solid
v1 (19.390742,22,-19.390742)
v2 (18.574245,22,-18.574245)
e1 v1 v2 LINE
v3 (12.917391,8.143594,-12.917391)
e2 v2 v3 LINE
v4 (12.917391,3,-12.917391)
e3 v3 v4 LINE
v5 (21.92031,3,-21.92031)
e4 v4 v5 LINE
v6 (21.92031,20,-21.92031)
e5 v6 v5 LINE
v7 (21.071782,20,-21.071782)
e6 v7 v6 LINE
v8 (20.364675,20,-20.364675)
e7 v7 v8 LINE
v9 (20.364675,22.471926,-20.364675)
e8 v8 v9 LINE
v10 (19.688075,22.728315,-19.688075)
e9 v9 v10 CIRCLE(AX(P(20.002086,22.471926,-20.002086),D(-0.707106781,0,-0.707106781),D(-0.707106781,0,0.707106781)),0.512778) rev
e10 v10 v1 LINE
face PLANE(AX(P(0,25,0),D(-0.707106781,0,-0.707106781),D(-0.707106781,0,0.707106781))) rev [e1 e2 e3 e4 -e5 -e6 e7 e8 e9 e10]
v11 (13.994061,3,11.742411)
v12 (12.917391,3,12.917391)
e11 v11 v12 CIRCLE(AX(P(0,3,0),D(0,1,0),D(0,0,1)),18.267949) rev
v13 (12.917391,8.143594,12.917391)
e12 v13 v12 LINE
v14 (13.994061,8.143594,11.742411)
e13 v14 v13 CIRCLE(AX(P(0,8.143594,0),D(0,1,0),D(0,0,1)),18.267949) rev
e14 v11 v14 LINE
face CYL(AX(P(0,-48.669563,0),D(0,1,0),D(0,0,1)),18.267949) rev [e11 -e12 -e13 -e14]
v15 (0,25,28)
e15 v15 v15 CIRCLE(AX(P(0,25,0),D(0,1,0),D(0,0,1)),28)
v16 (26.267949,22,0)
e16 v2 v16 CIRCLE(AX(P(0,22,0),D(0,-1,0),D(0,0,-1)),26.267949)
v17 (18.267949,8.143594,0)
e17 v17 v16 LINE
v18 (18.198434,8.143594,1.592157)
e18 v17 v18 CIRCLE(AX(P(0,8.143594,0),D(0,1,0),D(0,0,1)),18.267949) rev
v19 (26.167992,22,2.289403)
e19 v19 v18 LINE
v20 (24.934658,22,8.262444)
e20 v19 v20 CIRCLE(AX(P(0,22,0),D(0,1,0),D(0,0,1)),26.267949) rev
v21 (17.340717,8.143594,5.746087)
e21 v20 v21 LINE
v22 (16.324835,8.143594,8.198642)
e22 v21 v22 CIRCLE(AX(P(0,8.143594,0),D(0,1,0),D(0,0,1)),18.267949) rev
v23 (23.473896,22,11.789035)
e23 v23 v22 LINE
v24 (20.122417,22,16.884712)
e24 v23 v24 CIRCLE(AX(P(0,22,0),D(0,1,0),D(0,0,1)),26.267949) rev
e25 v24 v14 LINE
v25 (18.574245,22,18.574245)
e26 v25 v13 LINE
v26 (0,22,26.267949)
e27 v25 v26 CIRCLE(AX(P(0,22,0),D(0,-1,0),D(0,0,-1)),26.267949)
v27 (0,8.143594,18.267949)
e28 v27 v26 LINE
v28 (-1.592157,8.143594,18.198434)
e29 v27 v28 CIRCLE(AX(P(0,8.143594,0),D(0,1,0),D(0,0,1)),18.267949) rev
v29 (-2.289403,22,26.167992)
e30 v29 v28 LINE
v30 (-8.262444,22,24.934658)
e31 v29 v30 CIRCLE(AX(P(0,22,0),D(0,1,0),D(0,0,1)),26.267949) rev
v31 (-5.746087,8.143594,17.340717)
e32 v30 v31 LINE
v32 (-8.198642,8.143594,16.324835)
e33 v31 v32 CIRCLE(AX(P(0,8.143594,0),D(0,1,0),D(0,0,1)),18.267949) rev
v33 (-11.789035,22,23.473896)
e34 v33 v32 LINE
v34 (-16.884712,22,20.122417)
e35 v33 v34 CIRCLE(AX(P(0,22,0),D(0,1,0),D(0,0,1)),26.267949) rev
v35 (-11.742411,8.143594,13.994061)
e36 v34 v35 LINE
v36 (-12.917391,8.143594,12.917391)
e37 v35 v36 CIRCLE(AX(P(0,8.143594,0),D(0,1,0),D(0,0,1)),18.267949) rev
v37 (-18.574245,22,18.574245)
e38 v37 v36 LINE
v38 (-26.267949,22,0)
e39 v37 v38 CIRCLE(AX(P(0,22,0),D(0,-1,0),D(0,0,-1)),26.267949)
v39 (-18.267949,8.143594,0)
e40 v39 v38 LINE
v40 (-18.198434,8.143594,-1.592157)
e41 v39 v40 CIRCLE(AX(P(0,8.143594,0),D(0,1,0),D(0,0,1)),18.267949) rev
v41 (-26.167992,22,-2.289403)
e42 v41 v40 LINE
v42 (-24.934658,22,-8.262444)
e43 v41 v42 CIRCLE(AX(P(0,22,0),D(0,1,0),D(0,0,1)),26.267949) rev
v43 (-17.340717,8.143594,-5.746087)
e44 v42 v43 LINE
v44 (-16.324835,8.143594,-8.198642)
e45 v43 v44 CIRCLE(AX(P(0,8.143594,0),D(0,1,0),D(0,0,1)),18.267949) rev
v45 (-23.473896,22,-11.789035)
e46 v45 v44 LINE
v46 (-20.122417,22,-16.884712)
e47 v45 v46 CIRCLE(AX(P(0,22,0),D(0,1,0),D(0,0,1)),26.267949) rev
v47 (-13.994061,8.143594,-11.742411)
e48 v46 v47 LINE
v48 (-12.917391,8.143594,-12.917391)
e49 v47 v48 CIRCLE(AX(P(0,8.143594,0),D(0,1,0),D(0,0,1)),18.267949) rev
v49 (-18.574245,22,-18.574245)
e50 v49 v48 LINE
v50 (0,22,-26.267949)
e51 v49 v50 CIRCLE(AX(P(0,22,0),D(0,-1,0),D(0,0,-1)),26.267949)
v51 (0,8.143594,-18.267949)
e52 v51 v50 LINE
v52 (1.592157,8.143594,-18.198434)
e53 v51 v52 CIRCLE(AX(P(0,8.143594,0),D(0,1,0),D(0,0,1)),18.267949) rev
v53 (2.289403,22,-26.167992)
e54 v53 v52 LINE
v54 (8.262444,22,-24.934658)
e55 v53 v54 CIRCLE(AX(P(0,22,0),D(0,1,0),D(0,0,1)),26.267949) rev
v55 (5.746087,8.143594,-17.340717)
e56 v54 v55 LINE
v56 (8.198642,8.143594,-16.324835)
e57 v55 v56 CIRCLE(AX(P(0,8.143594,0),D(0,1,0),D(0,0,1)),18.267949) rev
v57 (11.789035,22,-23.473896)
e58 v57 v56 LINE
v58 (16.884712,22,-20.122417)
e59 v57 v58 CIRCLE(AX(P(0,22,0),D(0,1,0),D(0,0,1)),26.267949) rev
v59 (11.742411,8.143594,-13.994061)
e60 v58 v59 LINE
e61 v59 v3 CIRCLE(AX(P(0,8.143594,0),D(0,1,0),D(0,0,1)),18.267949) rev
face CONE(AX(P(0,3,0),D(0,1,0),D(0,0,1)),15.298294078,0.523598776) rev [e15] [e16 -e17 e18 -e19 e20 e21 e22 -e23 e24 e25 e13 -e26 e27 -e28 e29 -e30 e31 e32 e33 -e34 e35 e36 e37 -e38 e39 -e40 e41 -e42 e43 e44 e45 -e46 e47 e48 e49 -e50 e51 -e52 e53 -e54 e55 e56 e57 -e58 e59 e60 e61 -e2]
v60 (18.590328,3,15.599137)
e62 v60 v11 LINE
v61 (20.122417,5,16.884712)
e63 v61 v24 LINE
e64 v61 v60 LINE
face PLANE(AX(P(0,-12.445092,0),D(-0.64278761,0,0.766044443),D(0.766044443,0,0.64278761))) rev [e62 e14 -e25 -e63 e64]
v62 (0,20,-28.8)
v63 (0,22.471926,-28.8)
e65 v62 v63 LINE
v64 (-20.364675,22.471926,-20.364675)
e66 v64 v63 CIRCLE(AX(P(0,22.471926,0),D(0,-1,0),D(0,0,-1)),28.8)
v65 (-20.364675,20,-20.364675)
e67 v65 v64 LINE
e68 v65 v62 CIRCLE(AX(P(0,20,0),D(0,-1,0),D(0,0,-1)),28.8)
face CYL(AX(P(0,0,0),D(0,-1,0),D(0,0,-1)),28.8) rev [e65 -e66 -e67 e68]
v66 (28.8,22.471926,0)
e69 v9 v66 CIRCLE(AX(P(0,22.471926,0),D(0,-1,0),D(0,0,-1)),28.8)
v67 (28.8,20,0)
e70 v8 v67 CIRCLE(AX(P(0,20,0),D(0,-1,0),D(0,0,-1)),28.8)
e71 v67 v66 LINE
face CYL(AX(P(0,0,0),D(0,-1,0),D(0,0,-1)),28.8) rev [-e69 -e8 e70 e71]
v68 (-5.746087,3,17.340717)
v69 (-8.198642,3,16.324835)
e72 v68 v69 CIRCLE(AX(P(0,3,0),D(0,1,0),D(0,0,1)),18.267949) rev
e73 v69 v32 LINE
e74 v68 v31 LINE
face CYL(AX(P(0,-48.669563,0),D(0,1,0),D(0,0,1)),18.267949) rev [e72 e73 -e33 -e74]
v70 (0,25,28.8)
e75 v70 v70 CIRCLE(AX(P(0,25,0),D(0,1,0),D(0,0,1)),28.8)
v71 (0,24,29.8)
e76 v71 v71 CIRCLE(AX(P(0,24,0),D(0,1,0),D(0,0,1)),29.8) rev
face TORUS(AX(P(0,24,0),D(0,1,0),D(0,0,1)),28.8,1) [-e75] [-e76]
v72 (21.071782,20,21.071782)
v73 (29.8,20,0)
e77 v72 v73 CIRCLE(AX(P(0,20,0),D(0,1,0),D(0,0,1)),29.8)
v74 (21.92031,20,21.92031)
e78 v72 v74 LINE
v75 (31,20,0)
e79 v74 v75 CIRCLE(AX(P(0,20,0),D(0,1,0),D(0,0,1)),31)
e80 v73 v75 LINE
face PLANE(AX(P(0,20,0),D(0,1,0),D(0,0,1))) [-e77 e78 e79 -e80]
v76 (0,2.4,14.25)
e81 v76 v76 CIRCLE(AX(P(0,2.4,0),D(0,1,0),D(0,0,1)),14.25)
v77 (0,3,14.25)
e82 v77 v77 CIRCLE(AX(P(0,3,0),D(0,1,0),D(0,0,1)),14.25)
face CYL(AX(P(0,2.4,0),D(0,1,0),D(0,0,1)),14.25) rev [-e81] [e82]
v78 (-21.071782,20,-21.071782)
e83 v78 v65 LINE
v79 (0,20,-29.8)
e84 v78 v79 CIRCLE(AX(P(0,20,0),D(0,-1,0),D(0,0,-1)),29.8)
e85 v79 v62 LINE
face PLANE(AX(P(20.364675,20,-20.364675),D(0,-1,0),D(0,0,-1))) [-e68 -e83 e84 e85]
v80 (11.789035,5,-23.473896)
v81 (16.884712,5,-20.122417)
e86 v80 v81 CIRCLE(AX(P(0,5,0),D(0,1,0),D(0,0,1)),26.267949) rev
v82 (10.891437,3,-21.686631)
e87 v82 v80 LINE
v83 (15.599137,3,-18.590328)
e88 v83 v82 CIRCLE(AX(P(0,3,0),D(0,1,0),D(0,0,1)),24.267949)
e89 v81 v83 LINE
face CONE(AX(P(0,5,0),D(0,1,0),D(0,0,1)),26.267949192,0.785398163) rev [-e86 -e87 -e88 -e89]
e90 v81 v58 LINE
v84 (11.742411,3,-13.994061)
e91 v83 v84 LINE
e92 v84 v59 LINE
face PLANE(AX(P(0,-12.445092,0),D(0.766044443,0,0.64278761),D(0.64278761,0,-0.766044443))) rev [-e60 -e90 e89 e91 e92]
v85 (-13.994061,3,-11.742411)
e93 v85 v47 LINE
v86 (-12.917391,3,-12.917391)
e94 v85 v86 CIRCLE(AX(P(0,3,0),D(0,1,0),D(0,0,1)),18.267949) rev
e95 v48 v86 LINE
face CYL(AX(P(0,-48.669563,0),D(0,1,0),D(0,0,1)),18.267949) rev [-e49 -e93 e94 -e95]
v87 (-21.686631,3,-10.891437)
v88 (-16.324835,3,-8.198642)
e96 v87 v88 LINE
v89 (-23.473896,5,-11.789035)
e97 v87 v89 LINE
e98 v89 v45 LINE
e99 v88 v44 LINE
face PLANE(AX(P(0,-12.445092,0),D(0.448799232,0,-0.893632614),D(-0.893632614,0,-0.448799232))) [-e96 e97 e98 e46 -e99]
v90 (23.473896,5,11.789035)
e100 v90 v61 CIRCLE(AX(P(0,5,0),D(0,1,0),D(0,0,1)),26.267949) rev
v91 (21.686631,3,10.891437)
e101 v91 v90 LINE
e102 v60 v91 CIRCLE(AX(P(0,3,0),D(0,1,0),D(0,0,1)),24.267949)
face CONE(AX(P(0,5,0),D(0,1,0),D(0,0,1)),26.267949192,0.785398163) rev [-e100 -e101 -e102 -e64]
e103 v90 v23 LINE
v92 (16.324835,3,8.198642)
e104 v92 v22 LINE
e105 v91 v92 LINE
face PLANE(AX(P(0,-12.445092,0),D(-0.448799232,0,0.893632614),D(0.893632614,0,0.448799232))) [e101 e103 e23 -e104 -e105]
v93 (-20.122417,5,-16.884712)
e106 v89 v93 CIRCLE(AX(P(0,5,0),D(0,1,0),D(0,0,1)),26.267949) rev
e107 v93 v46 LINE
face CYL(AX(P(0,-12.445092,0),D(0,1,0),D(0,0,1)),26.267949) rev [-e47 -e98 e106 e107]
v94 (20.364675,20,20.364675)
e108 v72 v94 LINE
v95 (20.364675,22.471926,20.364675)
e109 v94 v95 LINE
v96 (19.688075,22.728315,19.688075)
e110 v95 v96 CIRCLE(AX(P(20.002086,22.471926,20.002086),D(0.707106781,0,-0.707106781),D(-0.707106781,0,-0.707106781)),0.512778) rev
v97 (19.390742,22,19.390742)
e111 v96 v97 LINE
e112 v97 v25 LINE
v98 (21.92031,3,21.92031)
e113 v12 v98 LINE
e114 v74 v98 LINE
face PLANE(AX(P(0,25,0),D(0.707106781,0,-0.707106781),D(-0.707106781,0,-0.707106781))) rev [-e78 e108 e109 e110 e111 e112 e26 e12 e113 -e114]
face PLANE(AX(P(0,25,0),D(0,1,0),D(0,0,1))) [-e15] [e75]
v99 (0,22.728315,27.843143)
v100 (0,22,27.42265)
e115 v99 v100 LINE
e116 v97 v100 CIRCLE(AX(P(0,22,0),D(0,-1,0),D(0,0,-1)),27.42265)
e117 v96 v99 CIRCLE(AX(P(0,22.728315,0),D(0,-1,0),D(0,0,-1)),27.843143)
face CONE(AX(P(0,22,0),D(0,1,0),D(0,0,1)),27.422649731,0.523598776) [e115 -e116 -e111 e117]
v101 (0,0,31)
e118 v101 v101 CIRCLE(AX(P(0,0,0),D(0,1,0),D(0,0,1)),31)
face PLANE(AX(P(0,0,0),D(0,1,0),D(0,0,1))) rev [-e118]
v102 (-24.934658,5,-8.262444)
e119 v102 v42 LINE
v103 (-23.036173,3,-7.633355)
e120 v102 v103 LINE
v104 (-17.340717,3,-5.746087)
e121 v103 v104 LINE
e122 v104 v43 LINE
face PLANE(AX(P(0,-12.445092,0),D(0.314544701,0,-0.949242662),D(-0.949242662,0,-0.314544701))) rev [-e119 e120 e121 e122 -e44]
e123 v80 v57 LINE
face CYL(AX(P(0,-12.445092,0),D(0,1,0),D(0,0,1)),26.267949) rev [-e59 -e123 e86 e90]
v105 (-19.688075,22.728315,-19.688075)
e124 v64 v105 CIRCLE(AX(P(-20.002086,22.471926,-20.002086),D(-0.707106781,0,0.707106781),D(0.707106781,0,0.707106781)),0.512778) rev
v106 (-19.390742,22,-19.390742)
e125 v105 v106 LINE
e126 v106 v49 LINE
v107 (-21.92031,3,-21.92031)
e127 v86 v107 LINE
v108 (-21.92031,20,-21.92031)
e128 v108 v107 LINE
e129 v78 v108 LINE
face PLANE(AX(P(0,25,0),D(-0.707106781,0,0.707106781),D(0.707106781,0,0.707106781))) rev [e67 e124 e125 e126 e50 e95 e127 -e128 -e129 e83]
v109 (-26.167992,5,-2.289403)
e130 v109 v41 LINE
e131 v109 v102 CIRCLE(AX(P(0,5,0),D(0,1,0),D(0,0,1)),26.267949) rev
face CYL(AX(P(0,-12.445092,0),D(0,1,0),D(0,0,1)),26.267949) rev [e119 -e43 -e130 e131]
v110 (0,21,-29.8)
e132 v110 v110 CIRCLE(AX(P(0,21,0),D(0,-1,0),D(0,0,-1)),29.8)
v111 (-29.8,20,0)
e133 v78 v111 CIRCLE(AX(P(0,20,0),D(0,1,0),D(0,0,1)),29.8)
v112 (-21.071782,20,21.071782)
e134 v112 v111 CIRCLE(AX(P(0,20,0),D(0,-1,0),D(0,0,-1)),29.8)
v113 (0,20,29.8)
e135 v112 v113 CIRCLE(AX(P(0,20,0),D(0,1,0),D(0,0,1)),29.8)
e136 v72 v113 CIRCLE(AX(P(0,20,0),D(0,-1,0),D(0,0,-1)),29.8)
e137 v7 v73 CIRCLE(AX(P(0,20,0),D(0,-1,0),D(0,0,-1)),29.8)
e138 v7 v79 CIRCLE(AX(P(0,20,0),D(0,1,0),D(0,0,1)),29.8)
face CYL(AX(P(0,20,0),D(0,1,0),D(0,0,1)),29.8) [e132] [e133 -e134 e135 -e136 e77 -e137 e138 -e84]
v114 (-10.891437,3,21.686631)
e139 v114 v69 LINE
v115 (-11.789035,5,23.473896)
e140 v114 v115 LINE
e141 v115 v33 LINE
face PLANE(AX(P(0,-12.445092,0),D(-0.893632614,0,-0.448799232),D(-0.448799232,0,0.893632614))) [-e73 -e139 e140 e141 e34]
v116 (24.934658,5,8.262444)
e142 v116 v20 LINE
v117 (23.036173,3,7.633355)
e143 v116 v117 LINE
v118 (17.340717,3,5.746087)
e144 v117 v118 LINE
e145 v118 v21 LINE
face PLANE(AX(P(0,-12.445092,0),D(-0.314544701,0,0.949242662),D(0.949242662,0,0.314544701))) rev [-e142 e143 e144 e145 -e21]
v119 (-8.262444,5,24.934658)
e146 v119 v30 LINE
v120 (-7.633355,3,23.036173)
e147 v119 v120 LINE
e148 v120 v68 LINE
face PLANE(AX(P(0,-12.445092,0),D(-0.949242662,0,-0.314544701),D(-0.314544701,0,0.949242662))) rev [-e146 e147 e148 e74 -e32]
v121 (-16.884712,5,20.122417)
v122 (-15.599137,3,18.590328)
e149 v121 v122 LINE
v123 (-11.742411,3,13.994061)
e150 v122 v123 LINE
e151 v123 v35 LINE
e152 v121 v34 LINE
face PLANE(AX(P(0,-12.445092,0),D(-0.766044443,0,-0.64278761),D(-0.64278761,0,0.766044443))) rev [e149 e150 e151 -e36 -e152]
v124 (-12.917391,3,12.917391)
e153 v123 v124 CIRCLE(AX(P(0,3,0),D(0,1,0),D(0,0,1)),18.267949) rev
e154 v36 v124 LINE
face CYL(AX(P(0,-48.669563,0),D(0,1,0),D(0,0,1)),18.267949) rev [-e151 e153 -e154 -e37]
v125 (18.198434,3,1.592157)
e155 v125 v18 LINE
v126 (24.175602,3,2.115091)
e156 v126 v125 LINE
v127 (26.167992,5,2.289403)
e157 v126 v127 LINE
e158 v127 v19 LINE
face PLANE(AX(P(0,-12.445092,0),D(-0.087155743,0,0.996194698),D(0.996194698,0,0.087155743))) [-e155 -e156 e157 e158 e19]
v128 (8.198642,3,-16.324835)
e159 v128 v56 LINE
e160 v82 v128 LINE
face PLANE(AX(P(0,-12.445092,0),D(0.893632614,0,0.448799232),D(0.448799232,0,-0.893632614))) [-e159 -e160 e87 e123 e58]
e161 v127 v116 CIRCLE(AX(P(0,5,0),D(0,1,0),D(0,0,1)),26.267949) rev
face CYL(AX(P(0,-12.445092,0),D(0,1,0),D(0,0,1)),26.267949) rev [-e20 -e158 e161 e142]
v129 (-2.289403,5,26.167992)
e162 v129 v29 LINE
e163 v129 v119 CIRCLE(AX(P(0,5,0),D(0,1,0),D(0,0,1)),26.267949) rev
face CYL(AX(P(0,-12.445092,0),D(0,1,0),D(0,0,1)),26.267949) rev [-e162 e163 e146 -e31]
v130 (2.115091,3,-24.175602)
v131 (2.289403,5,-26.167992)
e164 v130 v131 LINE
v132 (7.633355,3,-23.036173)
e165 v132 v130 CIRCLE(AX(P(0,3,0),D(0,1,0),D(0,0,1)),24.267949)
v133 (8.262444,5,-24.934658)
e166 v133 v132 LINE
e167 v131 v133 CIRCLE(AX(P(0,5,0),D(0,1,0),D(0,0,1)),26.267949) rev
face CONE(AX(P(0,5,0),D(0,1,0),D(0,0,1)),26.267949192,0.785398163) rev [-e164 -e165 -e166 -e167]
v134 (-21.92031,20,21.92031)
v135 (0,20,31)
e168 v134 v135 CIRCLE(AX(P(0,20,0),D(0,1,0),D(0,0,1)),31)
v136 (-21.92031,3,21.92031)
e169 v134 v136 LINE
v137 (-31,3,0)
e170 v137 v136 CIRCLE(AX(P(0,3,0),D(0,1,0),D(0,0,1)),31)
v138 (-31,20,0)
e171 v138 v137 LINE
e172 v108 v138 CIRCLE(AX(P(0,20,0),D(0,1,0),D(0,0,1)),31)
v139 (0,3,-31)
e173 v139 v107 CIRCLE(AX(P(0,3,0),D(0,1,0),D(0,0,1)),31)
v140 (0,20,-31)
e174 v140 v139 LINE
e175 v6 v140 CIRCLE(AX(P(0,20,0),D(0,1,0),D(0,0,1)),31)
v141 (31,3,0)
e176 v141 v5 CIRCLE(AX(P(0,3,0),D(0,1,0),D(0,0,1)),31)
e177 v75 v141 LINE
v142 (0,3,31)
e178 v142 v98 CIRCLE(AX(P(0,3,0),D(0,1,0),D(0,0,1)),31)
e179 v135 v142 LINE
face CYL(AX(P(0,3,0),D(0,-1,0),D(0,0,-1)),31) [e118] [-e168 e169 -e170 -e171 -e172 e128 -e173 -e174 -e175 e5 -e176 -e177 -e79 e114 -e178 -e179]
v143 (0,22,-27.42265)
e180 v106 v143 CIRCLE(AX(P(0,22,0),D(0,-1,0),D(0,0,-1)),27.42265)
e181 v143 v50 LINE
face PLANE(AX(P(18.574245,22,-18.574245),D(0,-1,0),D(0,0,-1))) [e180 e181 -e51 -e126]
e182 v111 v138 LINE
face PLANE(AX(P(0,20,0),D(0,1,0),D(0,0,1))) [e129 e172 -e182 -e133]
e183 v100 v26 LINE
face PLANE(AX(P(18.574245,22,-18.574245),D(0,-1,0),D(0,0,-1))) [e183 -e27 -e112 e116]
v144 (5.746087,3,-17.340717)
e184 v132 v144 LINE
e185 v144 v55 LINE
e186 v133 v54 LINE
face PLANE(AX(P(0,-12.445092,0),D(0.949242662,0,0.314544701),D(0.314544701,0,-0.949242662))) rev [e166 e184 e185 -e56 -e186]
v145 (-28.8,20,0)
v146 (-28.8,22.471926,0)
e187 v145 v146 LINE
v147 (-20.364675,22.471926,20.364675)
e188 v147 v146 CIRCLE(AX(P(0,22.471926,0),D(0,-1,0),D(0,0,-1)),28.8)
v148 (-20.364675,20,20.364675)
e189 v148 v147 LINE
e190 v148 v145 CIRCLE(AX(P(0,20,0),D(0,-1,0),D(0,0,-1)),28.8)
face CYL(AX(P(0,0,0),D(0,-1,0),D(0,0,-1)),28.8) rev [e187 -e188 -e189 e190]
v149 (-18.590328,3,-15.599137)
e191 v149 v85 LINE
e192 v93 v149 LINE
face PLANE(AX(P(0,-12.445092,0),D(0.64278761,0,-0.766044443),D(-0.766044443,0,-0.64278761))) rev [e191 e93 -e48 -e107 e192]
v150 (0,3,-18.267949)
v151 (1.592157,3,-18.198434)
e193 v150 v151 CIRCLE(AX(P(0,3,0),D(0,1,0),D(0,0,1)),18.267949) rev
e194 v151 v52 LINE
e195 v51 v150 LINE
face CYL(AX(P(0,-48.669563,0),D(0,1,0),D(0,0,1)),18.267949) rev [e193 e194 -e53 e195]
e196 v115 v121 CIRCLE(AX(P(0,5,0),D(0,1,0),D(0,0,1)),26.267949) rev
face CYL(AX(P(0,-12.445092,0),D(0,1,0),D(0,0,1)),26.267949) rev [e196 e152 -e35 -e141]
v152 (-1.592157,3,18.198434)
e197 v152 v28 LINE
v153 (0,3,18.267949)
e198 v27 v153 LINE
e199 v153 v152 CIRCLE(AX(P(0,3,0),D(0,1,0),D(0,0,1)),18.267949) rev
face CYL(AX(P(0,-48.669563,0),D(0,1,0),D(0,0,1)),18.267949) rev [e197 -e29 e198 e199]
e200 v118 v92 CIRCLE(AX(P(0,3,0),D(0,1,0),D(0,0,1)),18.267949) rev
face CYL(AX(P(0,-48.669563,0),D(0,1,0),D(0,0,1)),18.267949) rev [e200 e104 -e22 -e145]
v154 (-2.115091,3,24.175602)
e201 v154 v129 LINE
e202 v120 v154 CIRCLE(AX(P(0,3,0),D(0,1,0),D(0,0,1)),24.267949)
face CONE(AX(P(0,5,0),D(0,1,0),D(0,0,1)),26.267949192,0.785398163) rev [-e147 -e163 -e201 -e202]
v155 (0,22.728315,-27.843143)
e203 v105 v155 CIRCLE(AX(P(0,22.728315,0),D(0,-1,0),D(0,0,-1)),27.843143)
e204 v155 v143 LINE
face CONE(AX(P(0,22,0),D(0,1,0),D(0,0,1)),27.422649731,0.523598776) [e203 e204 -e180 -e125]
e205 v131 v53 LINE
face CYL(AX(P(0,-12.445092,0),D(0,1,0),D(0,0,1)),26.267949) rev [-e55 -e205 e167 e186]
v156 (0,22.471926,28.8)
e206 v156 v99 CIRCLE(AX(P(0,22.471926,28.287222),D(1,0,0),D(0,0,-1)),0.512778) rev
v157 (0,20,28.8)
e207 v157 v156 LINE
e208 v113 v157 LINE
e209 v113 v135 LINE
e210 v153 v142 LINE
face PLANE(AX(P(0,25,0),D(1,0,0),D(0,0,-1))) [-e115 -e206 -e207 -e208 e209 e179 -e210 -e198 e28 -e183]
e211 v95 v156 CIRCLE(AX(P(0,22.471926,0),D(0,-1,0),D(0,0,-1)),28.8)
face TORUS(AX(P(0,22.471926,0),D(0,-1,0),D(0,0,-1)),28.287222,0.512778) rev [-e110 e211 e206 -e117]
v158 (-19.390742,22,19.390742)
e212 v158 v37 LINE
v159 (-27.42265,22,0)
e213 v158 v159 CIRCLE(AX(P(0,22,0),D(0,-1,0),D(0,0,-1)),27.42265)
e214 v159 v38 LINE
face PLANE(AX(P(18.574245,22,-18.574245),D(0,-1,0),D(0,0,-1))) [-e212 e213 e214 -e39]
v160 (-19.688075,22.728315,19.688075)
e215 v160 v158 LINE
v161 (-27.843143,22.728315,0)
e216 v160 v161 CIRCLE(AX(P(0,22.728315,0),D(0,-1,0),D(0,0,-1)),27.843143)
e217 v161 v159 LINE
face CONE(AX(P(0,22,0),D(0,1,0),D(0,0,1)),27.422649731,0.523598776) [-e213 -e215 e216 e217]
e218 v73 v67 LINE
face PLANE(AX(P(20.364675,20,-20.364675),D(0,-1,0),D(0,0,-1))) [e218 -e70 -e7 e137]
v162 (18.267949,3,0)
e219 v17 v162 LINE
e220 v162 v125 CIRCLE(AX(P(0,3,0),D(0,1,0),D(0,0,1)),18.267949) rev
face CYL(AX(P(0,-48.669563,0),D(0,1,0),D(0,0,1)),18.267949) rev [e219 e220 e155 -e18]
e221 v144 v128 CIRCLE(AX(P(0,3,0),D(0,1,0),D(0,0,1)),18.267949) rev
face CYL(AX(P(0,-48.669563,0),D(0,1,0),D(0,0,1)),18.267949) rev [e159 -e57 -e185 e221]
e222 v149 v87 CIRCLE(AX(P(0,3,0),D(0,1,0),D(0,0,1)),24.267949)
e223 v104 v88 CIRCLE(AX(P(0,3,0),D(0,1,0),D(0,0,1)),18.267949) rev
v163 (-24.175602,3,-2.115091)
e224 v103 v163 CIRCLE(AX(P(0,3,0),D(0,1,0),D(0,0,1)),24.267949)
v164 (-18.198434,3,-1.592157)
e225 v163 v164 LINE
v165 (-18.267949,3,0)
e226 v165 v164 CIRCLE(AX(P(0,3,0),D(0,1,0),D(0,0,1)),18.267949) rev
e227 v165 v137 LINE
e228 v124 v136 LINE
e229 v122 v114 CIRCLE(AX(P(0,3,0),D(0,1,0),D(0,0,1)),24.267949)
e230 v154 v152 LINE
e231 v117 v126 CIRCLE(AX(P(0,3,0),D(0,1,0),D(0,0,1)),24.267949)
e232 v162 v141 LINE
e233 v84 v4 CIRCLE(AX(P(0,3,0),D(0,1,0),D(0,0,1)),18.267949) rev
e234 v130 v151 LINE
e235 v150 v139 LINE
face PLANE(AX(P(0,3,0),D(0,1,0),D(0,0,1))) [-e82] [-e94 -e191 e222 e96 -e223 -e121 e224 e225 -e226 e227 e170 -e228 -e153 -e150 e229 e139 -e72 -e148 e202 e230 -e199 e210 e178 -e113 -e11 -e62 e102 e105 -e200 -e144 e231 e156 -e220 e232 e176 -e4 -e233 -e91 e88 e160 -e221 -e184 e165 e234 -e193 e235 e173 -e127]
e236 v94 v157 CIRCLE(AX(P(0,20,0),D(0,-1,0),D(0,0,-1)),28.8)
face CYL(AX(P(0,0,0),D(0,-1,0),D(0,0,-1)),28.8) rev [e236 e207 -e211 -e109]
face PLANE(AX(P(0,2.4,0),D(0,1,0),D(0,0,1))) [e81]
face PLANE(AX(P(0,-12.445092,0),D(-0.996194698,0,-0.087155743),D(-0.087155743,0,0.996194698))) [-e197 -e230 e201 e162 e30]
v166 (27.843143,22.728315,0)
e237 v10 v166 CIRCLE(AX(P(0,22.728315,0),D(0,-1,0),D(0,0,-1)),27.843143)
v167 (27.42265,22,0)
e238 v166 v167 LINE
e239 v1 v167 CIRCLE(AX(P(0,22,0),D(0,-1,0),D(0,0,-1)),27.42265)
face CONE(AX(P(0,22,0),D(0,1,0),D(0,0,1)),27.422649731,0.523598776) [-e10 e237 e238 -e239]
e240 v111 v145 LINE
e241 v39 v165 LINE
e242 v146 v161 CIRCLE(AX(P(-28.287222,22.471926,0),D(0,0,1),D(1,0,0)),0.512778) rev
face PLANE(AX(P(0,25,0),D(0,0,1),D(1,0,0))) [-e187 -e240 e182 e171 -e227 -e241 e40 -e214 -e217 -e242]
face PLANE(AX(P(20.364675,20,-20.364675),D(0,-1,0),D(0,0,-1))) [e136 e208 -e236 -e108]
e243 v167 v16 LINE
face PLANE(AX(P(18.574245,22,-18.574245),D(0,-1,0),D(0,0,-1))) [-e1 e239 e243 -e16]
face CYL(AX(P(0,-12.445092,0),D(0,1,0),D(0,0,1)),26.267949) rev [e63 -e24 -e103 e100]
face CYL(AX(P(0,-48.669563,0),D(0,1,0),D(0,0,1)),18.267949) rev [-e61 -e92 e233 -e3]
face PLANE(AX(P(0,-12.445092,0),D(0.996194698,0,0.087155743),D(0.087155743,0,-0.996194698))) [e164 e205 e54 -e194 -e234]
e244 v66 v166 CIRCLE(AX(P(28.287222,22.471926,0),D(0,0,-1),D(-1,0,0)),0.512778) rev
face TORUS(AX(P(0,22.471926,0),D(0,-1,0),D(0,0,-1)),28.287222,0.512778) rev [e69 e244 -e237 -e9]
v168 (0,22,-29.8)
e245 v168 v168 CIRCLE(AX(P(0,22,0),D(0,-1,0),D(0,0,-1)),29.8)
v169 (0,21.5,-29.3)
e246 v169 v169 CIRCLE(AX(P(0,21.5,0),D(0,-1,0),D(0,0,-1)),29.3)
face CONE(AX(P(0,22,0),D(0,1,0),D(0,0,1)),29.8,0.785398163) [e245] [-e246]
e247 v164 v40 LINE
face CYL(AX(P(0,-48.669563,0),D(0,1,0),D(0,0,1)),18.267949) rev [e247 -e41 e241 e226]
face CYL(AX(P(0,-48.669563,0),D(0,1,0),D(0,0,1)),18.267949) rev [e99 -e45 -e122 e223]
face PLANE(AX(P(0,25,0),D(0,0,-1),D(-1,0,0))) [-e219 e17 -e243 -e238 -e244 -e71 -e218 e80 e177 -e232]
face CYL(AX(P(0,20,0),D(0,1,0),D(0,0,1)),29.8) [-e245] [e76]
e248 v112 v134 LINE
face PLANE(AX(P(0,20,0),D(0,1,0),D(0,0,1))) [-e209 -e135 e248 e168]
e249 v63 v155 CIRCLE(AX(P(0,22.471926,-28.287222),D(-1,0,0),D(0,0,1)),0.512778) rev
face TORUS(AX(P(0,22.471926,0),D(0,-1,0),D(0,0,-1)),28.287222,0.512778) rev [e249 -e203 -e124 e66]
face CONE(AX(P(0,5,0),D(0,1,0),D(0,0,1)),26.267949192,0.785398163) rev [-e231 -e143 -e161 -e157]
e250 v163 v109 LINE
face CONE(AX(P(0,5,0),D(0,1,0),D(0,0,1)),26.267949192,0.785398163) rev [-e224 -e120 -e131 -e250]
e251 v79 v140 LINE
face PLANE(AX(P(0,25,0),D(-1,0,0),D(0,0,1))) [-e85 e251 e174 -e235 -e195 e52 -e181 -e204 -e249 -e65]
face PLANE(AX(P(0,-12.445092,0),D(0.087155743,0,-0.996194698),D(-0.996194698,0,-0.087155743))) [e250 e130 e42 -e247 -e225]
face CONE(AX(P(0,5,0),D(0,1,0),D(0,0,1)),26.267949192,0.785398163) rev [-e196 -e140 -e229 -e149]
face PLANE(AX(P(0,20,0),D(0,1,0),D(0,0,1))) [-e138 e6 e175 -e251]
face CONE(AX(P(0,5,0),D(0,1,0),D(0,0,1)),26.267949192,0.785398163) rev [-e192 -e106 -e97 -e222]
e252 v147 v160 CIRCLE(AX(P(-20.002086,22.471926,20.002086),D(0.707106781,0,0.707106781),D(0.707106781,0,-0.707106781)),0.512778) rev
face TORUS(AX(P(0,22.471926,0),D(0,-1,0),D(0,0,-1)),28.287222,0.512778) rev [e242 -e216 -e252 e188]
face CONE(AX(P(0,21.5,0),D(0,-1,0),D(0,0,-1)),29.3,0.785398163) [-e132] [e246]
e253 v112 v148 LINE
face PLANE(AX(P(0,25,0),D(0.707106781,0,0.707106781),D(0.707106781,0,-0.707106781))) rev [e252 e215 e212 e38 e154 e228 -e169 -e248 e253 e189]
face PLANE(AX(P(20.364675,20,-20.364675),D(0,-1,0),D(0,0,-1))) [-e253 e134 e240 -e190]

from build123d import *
from OCP.BRepFilletAPI import BRepFilletAPI_MakeChamfer
from build123d.topology import SkipClean

# Parameters (mm, degrees)
SKETCH_1_R          = 31
EXTRUDE_1_DEPTH     = 3
EXTRUDE_2_DEPTH     = 22
SKETCH_3_R          = 14.25
CUT_EXTRUDE_1_DEPTH = 0.6
CUT_EXTRUDE_START   = -5
SKETCH_4_R          = 31
SKETCH_4_R_2        = 29.8
CUT_EXTRUDE_2_DEPTH = 5
FILLET_1_R          = 1
CHAMFER_1_SIZE      = 22
CHAMFER_1_SIZE_2    = 12.701705922
CUT_EXTRUDE_3_DEPTH = 22
SKETCH_7_R          = 18.267949192
CUT_EXTRUDE_4_DEPTH = 22
CHAMFER_2_SIZE      = 2


with BuildPart() as part:
    # 草图1 → 凸台-拉伸1 (new body)
    with BuildSketch(Plane(origin=(0, 0, 0), x_dir=(1, 0, 0), z_dir=(0, 1, 0))):
        with Locations(Location((0, 0, 0), (0, 0, 270))):
            Circle(SKETCH_1_R)
    extrude(amount=EXTRUDE_1_DEPTH)

    # 草图2 → 凸台-拉伸2 (add)
    with SkipClean():  # the faces are left unmerged after this step: merging them gives an invalid solid
        with BuildSketch(Plane(origin=(0, 3, 0), x_dir=(1, 0, 0), z_dir=(0, 1, 0))):
            with BuildLine():
                Line((0, 31), (0, 28))
                ThreePointArc((0, 28), (10.715136106, 25.86862691), (19.798989873, 19.798989873))
                Line((19.798989873, 19.798989873), (21.920310217, 21.920310217))
                ThreePointArc((21.920310217, 21.920310217), (11.863186403, 28.640265508), (0, 31))
            make_face()
            with BuildLine():
                ThreePointArc((-28, 0), (-25.86862691, 10.715136106), (-19.798989873, 19.798989873))
                Line((-19.798989873, 19.798989873), (-21.920310217, 21.920310217))
                ThreePointArc((-21.920310217, 21.920310217), (-28.640265508, 11.863186403), (-31, 0))
                Line((-31, 0), (-28, 0))
            make_face()
            with BuildLine():
                ThreePointArc((0, -28), (-10.715136106, -25.86862691), (-19.798989873, -19.798989873))
                Line((-19.798989873, -19.798989873), (-21.920310217, -21.920310217))
                ThreePointArc((-21.920310217, -21.920310217), (-11.863186403, -28.640265508), (0, -31))
                Line((0, -31), (0, -28))
            make_face()
            with BuildLine():
                Line((31, 0), (28, 0))
                ThreePointArc((28, 0), (25.86862691, -10.715136106), (19.798989873, -19.798989873))
                Line((19.798989873, -19.798989873), (21.920310217, -21.920310217))
                ThreePointArc((21.920310217, -21.920310217), (28.640265508, -11.863186403), (31, 0))
            make_face()
        extrude(amount=EXTRUDE_2_DEPTH)

    # 草图3 → 切除-拉伸1 (cut)
    with SkipClean():  # the faces are left unmerged after this step: merging them gives an invalid solid
        with BuildSketch(Plane(origin=(0, 3, 0), x_dir=(1, 0, 0), z_dir=(0, 1, 0))):
            with Locations(Location((0, 0, 0), (0, 0, 270))):
                Circle(SKETCH_3_R)
        extrude(amount=-CUT_EXTRUDE_1_DEPTH, mode=Mode.SUBTRACT)

    # 草图4 → 切除-拉伸2 (cut)
    with SkipClean():  # the faces are left unmerged after this step: merging them gives an invalid solid
        with BuildSketch(Plane(origin=(0, 25, 0), x_dir=(1, 0, 0), z_dir=(0, 1, 0)).offset(CUT_EXTRUDE_START)):
            with Locations(Location((0, 0, 0), (0, 0, 270))):
                Circle(SKETCH_4_R)
            Circle(SKETCH_4_R_2, mode=Mode.SUBTRACT)
        extrude(amount=CUT_EXTRUDE_2_DEPTH, mode=Mode.SUBTRACT)

    # 圆角1
    fillet_1_edges = [part.edges().sort_by_distance(p)[0] for p in [
        (27.531610069, 25, 11.403966284),
        (11.403966284, 25, -27.531610069),
        (-27.531610069, 25, -11.403966284),
        (-11.403966284, 25, 27.531610069),
    ]]
    fillet(fillet_1_edges, radius=FILLET_1_R)

    # 倒角1
    chamfer_1_edges_1 = [part.edges().sort_by_distance(p)[0] for p in [
        (-10.715136106, 3, 25.86862691),
    ]]
    chamfer_1_side_1 = [part.faces().sort_by_distance(p)[0] for p in [
        (-10.715136106, 3.254034118, 25.86862691),
    ]]
    chamfer_1_edges_2 = [part.edges().sort_by_distance(p)[0] for p in [
        (25.86862691, 3, 10.715136106),
    ]]
    chamfer_1_side_2 = [part.faces().sort_by_distance(p)[0] for p in [
        (25.633929988, 3, 10.617921458),
    ]]
    chamfer_1_edges_3 = [part.edges().sort_by_distance(p)[0] for p in [
        (10.715136106, 3, -25.86862691),
    ]]
    chamfer_1_side_3 = [part.faces().sort_by_distance(p)[0] for p in [
        (10.617921458, 3, -25.633929988),
    ]]
    chamfer_1_edges_4 = [part.edges().sort_by_distance(p)[0] for p in [
        (-25.86862691, 3, -10.715136106),
    ]]
    chamfer_1_side_4 = [part.faces().sort_by_distance(p)[0] for p in [
        (-25.633929988, 3, -10.617921458),
    ]]
    chamfer_1 = BRepFilletAPI_MakeChamfer(part.part.solid().wrapped)
    for e in chamfer_1_edges_1:
        chamfer_1.Add(CHAMFER_1_SIZE - 0.0001, CHAMFER_1_SIZE_2 - 0.0001, e.wrapped, chamfer_1_side_1[0].wrapped)
    for e in chamfer_1_edges_2:
        chamfer_1.Add(CHAMFER_1_SIZE_2 - 0.0001, CHAMFER_1_SIZE - 0.0001, e.wrapped, chamfer_1_side_2[0].wrapped)
    for e in chamfer_1_edges_3:
        chamfer_1.Add(CHAMFER_1_SIZE_2 - 0.0001, CHAMFER_1_SIZE - 0.0001, e.wrapped, chamfer_1_side_3[0].wrapped)
    for e in chamfer_1_edges_4:
        chamfer_1.Add(CHAMFER_1_SIZE_2 - 0.0001, CHAMFER_1_SIZE - 0.0001, e.wrapped, chamfer_1_side_4[0].wrapped)
    add(Compound.cast(chamfer_1.Shape()), mode=Mode.REPLACE)  # a hair under: the kernel refuses the full size

    # 草图5 → 旋转1 (revolve)
    with SkipClean():  # the faces are left unmerged after this step: merging them gives an invalid solid
        with BuildSketch(Plane(origin=(0, 0, 0), x_dir=(0.7071067811865462, 0, -0.7071067811865488), z_dir=(0.7071067811865488, 0, 0.7071067811865462)), mode=Mode.PRIVATE) as revolve_1_sk:
            with BuildLine():
                Line((26.267949192, 22), (28, 25))
                Line((28, 25), (28.8, 25))
                ThreePointArc((28.8, 25), (29.507106781, 24.707106781), (29.8, 24))
                Line((29.8, 24), (29.8, 20))
                Line((29.8, 20), (28.8, 20))
                Line((28.8, 20), (28.8, 21.2))
                Line((28.8, 21.2), (28.8, 22.471926391))
                ThreePointArc((28.8, 22.471926391), (28.419938572, 22.967232087), (27.843142872, 22.728315485))
                Line((27.843142872, 22.728315485), (27.422649731, 22))
                Line((27.422649731, 22), (26.267949192, 22))
            make_face()
        revolve(revolve_1_sk.sketch.rotate(Axis((0, 0, 0), (0, 1, 0)), 225), axis=Axis((0, 0, 0), (0, 1, 0)))

    # 草图6 → 切除-拉伸3 (cut)
    with SkipClean():  # the faces are left unmerged after this step: merging them gives an invalid solid
        with BuildSketch(Plane(origin=(0, 25, 0), x_dir=(1, 0, 0), z_dir=(0, 1, 0))):
            with BuildLine():
                Line((2.289402622, 26.167991715), (1.333334183, 15.24007945))
                ThreePointArc((1.333334183, 15.24007945), (3.093583453, 14.982240924), (4.811997335, 14.521793393))
                Line((4.811997335, 14.521793393), (8.262444223, 24.934658013))
                ThreePointArc((8.262444223, 24.934658013), (5.311840168, 25.725269849), (2.289402622, 26.167991715))
            make_face()
            with BuildLine():
                Line((11.789035429, 23.473896107), (6.865862636, 13.67105453))
                ThreePointArc((6.865862636, 13.67105453), (8.406550317, 12.781537993), (9.833553883, 11.719173168))
                Line((9.833553883, 11.719173168), (16.884712273, 20.122416511))
                ThreePointArc((16.884712273, 20.122416511), (14.434474555, 21.946550961), (11.789035429, 23.473896107))
            make_face()
            with BuildLine():
                Line((26.167991715, -2.289402622), (15.24007945, -1.333334183))
                ThreePointArc((15.24007945, -1.333334183), (15.236219542, -1.376740994), (15.232236002, -1.420136634))
                ThreePointArc((15.232236002, -1.420136634), (14.973367893, -3.136248655), (14.521793393, -4.811997335))
                Line((14.521793393, -4.811997335), (24.934658013, -8.262444223))
                ThreePointArc((24.934658013, -8.262444223), (25.725269849, -5.311840168), (26.167991715, -2.289402622))
            make_face()
            with BuildLine():
                ThreePointArc((20.122416511, -16.884712273), (21.946550961, -14.434474555), (23.473896107, -11.789035429))
                Line((23.473896107, -11.789035429), (13.67105453, -6.865862636))
                ThreePointArc((13.67105453, -6.865862636), (13.568862199, -7.06567621), (13.46374963, -7.263969136))
                ThreePointArc((13.46374963, -7.263969136), (12.656839716, -8.593149021), (11.719173168, -9.833553883))
                Line((11.719173168, -9.833553883), (20.122416511, -16.884712273))
            make_face()
            with BuildLine():
                Line((-4.811997335, -14.521793393), (-8.262444223, -24.934658013))
                ThreePointArc((-8.262444223, -24.934658013), (-5.311840168, -25.725269849), (-2.289402622, -26.167991715))
                Line((-2.289402622, -26.167991715), (-1.333334183, -15.24007945))
                ThreePointArc((-1.333334183, -15.24007945), (-1.872450055, -15.183271468), (-2.409214758, -15.107398384))
                ThreePointArc((-2.409214758, -15.107398384), (-3.622459016, -14.86322954), (-4.811997335, -14.521793393))
            make_face()
            with BuildLine():
                ThreePointArc((-8.03901839, -13.015835933), (-8.959773629, -12.400010411), (-9.833553883, -11.719173168))
                Line((-9.833553883, -11.719173168), (-16.884712273, -20.122416511))
                ThreePointArc((-16.884712273, -20.122416511), (-14.434474555, -21.946550961), (-11.789035429, -23.473896107))
                Line((-11.789035429, -23.473896107), (-6.865862636, -13.67105453))
                ThreePointArc((-6.865862636, -13.67105453), (-7.45963789, -13.356331991), (-8.03901839, -13.015835933))
            make_face()
            with BuildLine():
                ThreePointArc((-15.24007945, 1.333334183), (-14.982240924, 3.093583453), (-14.521793393, 4.811997335))
                Line((-14.521793393, 4.811997335), (-24.934658013, 8.262444223))
                ThreePointArc((-24.934658013, 8.262444223), (-25.619900687, 5.798779489), (-26.062342723, 3.280159533))
                ThreePointArc((-26.062342723, 3.280159533), (-26.119865212, 2.785282046), (-26.167991715, 2.289402622))
                Line((-26.167991715, 2.289402622), (-15.24007945, 1.333334183))
            make_face()
            with BuildLine():
                ThreePointArc((-13.67105453, 6.865862636), (-12.781537993, 8.406550317), (-11.719173168, 9.833553883))
                Line((-11.719173168, 9.833553883), (-20.122416511, 16.884712273))
                ThreePointArc((-20.122416511, 16.884712273), (-21.697809703, 14.805749182), (-23.059246756, 12.580790668))
                ThreePointArc((-23.059246756, 12.580790668), (-23.26993909, 12.186676721), (-23.473896107, 11.789035429))
                Line((-23.473896107, 11.789035429), (-13.67105453, 6.865862636))
            make_face()
        extrude(amount=-CUT_EXTRUDE_3_DEPTH, mode=Mode.SUBTRACT)

    # 草图7 → 切除-拉伸4 (cut)
    with SkipClean():  # the faces are left unmerged after this step: merging them gives an invalid solid
        with BuildSketch(Plane(origin=(0, 25, 0), x_dir=(1, 0, 0), z_dir=(0, 1, 0))):
            Circle(SKETCH_7_R)
        extrude(amount=-CUT_EXTRUDE_4_DEPTH, mode=Mode.SUBTRACT)

    # 草图9 → 切除-旋转1 (revolve, cut)
    with SkipClean():  # the faces are left unmerged after this step: merging them gives an invalid solid
        with BuildSketch(Plane.XY, mode=Mode.PRIVATE) as cut_revolve_1_sk:
            Polygon((29.8, 22), (29.3, 21.5), (29.8, 21), align=None)
        revolve(cut_revolve_1_sk.sketch.rotate(Axis((0, 0, 0), (0, 1, 0)), 90), axis=Axis((0, 0, 0), (0, 1, 0)), mode=Mode.SUBTRACT)

    # 倒角2
    chamfer_2_edges = [part.edges().sort_by_distance(p)[0] for p in [
        (-5.311840168, 3, 25.725269849),
        (21.946550961, 3, 14.434474555),
        (25.725269849, 3, 5.311840168),
        (14.434474555, 3, -21.946550961),
        (-21.946550961, 3, -14.434474555),
        (-25.725269849, 3, -5.311840168),
        (-14.434474555, 3, 21.946550961),
        (5.311840168, 3, -25.725269849),
    ]]
    chamfer(chamfer_2_edges, length=CHAMFER_2_SIZE)


solid = part.part
